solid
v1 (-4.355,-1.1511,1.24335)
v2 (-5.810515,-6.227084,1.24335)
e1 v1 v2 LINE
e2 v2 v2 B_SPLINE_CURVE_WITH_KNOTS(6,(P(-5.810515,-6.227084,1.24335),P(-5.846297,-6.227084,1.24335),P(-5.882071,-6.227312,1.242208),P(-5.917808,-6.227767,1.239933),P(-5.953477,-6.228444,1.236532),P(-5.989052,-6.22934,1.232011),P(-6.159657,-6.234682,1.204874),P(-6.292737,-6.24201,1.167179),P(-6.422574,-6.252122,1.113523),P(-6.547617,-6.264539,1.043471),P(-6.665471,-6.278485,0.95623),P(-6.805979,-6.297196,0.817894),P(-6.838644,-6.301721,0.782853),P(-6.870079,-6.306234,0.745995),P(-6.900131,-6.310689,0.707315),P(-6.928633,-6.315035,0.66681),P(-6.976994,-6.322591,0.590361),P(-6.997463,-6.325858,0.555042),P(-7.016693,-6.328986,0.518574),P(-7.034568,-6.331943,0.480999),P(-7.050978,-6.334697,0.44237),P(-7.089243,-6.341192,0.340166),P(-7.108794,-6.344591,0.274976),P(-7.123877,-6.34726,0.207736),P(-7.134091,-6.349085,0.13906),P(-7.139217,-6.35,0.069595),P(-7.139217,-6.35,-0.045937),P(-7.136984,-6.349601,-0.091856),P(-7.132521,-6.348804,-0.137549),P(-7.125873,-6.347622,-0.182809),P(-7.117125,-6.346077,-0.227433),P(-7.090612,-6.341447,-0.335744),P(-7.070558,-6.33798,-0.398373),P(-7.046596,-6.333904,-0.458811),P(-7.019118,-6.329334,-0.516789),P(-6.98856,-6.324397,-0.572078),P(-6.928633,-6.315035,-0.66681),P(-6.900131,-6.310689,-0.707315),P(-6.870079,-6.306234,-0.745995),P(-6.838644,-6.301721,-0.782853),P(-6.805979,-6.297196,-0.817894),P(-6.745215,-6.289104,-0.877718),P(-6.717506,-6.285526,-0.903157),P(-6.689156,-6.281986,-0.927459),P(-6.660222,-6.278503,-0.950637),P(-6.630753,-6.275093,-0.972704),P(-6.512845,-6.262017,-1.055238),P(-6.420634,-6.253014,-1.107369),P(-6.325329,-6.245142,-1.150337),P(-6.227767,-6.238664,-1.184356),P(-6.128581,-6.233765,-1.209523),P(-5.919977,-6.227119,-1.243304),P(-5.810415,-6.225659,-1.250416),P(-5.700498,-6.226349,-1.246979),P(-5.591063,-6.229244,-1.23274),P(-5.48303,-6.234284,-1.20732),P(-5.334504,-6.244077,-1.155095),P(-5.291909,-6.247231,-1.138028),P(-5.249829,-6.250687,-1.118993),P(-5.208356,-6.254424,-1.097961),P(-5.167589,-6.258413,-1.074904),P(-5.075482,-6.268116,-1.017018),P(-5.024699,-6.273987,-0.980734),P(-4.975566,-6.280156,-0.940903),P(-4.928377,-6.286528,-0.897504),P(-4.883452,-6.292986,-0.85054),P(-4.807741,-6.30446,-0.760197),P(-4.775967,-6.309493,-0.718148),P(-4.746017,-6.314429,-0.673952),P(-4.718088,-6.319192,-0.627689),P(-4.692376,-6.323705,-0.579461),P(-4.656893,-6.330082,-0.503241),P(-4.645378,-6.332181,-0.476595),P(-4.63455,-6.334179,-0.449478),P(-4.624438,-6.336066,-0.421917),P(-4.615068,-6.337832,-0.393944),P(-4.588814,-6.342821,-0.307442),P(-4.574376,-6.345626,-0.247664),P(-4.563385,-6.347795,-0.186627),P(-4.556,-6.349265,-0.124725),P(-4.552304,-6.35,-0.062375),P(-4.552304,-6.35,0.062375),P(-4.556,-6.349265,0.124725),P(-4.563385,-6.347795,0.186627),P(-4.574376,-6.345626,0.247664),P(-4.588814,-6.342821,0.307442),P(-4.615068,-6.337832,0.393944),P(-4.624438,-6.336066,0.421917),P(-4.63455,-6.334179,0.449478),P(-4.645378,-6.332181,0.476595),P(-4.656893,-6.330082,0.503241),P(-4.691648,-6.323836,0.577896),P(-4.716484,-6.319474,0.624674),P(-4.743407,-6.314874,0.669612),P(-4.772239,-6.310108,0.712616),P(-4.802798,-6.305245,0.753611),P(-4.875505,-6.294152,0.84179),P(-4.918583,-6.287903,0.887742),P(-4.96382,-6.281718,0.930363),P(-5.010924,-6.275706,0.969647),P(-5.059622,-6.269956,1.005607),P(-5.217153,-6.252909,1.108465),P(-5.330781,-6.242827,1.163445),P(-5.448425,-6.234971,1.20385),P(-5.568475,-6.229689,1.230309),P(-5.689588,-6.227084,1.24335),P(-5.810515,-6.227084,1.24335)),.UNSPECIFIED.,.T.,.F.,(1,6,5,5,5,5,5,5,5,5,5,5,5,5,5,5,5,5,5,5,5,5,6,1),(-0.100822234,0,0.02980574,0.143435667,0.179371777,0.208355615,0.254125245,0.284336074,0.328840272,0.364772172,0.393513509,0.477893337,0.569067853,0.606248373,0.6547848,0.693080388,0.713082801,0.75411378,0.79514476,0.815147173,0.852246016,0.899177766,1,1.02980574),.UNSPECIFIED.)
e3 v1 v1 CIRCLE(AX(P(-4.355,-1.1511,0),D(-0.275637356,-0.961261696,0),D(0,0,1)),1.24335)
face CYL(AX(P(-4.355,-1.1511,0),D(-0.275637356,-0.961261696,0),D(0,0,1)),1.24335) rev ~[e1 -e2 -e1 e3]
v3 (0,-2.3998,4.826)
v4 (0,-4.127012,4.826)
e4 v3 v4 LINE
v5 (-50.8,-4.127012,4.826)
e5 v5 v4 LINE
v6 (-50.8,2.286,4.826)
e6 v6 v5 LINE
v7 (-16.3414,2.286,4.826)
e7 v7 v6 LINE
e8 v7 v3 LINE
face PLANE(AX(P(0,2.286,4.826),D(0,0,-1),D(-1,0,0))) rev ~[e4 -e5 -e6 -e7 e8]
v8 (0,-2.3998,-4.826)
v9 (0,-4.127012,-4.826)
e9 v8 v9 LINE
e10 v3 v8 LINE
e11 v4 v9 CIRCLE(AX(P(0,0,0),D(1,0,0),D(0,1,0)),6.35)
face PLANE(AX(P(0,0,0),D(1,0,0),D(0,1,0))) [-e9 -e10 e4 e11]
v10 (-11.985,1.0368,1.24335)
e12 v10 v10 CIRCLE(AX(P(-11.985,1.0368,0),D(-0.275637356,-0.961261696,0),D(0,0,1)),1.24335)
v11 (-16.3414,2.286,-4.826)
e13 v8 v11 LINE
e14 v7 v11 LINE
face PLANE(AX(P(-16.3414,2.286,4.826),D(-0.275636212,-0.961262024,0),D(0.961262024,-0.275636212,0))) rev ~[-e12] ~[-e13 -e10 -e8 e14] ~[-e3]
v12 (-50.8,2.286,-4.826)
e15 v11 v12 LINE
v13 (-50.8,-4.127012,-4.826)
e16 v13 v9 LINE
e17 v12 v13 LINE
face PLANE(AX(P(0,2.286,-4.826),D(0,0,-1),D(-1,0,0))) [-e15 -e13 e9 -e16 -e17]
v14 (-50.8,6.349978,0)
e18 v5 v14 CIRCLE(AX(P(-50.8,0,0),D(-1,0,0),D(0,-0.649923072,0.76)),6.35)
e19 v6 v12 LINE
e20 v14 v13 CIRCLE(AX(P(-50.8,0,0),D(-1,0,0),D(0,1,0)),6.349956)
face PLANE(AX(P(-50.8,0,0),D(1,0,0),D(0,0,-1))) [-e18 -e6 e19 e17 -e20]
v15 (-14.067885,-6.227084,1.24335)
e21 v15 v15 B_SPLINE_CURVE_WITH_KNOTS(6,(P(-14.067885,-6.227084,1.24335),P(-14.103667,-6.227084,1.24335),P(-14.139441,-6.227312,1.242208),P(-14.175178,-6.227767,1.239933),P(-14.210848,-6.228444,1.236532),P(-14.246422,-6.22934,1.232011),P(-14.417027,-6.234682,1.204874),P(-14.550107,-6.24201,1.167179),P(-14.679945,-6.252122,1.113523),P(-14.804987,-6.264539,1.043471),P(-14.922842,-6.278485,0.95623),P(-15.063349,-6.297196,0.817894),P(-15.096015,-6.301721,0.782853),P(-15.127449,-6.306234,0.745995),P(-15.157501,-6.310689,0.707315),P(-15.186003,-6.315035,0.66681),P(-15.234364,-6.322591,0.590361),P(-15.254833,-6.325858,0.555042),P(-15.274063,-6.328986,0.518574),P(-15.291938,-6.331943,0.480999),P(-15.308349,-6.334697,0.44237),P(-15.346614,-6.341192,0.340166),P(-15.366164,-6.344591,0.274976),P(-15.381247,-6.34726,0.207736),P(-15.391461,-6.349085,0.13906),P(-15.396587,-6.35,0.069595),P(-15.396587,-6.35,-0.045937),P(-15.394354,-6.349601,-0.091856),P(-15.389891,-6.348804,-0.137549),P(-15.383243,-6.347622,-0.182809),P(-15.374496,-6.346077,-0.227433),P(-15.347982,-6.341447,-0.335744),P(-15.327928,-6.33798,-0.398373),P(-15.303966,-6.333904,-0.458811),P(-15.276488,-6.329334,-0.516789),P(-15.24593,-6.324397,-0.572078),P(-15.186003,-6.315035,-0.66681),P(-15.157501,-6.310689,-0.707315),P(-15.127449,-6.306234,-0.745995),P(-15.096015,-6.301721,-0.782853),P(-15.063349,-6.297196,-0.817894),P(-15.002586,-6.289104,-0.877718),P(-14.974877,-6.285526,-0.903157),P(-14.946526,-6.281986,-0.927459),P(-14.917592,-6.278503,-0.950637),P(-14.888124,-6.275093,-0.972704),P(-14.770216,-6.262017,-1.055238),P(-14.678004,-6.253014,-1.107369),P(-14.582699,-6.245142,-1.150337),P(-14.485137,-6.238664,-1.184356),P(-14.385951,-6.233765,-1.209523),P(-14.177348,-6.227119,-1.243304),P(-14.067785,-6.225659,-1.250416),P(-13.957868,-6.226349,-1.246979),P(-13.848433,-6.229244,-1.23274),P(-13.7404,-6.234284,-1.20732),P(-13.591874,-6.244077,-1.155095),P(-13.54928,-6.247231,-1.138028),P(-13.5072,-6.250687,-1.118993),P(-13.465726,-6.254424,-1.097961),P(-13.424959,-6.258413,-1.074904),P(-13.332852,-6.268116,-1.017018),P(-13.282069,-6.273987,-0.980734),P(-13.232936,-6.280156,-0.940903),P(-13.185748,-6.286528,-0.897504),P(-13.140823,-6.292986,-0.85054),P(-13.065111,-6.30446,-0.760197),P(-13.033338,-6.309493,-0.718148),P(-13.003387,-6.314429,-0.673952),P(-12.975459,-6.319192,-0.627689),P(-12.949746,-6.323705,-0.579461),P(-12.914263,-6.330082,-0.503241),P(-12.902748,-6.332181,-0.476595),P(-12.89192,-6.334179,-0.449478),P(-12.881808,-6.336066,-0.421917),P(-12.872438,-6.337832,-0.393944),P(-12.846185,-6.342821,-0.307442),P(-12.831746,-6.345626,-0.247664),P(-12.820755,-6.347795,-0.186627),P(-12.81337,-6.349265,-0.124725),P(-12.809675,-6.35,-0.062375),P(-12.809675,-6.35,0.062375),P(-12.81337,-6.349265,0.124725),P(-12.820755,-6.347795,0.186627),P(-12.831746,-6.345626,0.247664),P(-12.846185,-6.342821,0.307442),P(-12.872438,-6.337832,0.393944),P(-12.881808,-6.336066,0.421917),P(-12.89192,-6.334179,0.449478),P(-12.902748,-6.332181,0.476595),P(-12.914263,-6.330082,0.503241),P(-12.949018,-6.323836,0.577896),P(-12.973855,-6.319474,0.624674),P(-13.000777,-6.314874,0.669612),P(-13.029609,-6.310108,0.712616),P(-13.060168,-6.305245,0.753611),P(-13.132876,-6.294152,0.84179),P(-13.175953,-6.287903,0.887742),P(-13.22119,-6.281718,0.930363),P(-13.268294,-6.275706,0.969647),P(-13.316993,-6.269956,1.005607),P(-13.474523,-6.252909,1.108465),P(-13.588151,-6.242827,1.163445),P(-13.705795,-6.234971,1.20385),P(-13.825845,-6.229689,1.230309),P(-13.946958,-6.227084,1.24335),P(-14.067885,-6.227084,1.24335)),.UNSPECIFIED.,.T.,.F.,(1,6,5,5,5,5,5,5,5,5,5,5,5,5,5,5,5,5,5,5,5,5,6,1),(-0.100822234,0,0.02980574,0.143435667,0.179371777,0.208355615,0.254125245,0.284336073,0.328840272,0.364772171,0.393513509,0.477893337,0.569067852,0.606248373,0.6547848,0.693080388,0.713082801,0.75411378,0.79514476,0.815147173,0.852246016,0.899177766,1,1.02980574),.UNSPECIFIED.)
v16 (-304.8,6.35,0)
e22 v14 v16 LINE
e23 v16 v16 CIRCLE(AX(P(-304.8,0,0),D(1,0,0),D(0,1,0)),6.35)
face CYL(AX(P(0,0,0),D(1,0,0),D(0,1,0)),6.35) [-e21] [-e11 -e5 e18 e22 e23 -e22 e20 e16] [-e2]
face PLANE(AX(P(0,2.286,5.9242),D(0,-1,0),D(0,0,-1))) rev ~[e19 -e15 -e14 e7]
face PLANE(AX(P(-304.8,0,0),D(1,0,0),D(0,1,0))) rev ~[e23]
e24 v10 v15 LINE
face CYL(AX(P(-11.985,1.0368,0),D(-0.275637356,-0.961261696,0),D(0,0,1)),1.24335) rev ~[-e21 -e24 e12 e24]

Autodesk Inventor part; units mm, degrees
ref_plane "YZ Plane" through (0, 0, 0) normal (1, 0, 0) x (0, 1, 0)
ref_plane "XZ Plane" through (0, 0, 0) normal (0, 1, 0) x (-1, 0, 0)
ref_plane "XY Plane" through (0, 0, 0) normal (0, 0, 1) x (1, 0, 0)
sketch "Sketch1" plane through (0, 0, 0) normal (1, 0, 0) x (0, 1, 0)
  circle A0 centre (0, 0) radius 6.35
  dimension "d159" = 12.7
extrude "Extrusion1" add sketch "Sketch1" against normal blind 304.8
sketch "Sketch2" plane through (0, 0, 0) normal (1, 0, 0) x (0, 0, -1)
  arc A0 (5.9242, 2.286) -> (-5.9242, 2.286) centre (0, 0) ccw
  circle A1 centre (0, 0) radius 6.35 projected
  line L0 (-5.9242, 2.286) -> (5.9242, 2.286)
  dimension "d111" = 4.064
extrude "Extrusion2" cut sketch "Sketch2" against normal blind 50.8 contours L0 A0
sketch "Sketch5" plane through (0, 2.286, 5.9242) normal (0, 1, 0) x (1, 0, 0)
  line L0 (0, 5.9242) -> (0, 10.7502)
  line L1 (0, 11.8485) -> (0, 0) projected
  line L2 (0, 10.7502) -> (-50.8, 10.7502)
  line L3 (-50.8, 11.8485) -> (-50.8, 0) projected
  line L4 (0, 5.9242) -> (0, 1.0982)
  line L5 (0, 1.0982) -> (-50.8, 1.0982)
  line L6 (-50.8, 1.0982) -> (-50.8, -4.826)
  line L7 (-50.8, -4.826) -> (10.2611, -4.826)
  line L8 (10.2611, -4.826) -> (0, 1.0982)
  line L9 (-50.8, 10.7502) -> (-50.8, 16.6745)
  line L10 (-50.8, 16.6745) -> (10.2611, 16.6745)
  line L11 (0, 10.7502) -> (10.2611, 16.6745)
  line L12 (-50.8, 11.8485) -> (0, 11.8485) projected
  dimension "d20" = 4.826
  dimension "d21" = 4.826
  dimension "d160" = 4.826
extrude "Extrusion3" cut sketch "Sketch5" against normal blind 25.4 contours L2 L3 L12 L1 | L1 L12 L9 L10 L11 | L8 L7 L6 L3 L5
sketch "Sketch18" plane through (-50.8, 2.286, 4.826) normal (0, 0, 1) x (1, 0, 0)
  line L0 (34.4586, 0) -> (50.8, -4.6858)
  line L1 (0, 0) -> (50.8, 0) projected
  line L2 (34.4586, 0) -> (50.8, 0)
  line L3 (50.8, 0) -> (50.8, -4.6858)
  dimension "d144" = 17
  dimension "d161" = 74
extrude "Extrusion9" cut sketch "Sketch18" against normal blind 25.4
sketch "Sketch19" plane through (-16.3414, 2.286, 4.826) normal (0.2756374, 0.9612617, 0) x (0.9612617, -0.2756374, 0)
  circle A0 centre (12.4695, 4.826) radius 1.5875
  circle A1 centre (4.532, 4.826) radius 1.5875
  line L0 (14.057, 4.826) -> (17, 4.826)
  line L1 (17, 9.652) -> (17, 0) projected
  line L2 (14.057, 4.826) -> (4.532, 4.826) construction
  dimension "d148" = 3.175
  dimension "d149" = 3.175
  dimension "d151" = 7.9375
  dimension "d162" = 2.943
hole "Hole9" at (-11.985, 1.0368, 0) at (-4.355, -1.1511, 0) direction (-0.2756374, -0.9612617, 0) diameter 2.4867 end through all thread size "5-40 UNC" class "2B" standard "ANSI Unified Screw Threads"
equation "\"d160\" = d20"
properties part number "rat_headbarAngled" material "Stainless Steel"
